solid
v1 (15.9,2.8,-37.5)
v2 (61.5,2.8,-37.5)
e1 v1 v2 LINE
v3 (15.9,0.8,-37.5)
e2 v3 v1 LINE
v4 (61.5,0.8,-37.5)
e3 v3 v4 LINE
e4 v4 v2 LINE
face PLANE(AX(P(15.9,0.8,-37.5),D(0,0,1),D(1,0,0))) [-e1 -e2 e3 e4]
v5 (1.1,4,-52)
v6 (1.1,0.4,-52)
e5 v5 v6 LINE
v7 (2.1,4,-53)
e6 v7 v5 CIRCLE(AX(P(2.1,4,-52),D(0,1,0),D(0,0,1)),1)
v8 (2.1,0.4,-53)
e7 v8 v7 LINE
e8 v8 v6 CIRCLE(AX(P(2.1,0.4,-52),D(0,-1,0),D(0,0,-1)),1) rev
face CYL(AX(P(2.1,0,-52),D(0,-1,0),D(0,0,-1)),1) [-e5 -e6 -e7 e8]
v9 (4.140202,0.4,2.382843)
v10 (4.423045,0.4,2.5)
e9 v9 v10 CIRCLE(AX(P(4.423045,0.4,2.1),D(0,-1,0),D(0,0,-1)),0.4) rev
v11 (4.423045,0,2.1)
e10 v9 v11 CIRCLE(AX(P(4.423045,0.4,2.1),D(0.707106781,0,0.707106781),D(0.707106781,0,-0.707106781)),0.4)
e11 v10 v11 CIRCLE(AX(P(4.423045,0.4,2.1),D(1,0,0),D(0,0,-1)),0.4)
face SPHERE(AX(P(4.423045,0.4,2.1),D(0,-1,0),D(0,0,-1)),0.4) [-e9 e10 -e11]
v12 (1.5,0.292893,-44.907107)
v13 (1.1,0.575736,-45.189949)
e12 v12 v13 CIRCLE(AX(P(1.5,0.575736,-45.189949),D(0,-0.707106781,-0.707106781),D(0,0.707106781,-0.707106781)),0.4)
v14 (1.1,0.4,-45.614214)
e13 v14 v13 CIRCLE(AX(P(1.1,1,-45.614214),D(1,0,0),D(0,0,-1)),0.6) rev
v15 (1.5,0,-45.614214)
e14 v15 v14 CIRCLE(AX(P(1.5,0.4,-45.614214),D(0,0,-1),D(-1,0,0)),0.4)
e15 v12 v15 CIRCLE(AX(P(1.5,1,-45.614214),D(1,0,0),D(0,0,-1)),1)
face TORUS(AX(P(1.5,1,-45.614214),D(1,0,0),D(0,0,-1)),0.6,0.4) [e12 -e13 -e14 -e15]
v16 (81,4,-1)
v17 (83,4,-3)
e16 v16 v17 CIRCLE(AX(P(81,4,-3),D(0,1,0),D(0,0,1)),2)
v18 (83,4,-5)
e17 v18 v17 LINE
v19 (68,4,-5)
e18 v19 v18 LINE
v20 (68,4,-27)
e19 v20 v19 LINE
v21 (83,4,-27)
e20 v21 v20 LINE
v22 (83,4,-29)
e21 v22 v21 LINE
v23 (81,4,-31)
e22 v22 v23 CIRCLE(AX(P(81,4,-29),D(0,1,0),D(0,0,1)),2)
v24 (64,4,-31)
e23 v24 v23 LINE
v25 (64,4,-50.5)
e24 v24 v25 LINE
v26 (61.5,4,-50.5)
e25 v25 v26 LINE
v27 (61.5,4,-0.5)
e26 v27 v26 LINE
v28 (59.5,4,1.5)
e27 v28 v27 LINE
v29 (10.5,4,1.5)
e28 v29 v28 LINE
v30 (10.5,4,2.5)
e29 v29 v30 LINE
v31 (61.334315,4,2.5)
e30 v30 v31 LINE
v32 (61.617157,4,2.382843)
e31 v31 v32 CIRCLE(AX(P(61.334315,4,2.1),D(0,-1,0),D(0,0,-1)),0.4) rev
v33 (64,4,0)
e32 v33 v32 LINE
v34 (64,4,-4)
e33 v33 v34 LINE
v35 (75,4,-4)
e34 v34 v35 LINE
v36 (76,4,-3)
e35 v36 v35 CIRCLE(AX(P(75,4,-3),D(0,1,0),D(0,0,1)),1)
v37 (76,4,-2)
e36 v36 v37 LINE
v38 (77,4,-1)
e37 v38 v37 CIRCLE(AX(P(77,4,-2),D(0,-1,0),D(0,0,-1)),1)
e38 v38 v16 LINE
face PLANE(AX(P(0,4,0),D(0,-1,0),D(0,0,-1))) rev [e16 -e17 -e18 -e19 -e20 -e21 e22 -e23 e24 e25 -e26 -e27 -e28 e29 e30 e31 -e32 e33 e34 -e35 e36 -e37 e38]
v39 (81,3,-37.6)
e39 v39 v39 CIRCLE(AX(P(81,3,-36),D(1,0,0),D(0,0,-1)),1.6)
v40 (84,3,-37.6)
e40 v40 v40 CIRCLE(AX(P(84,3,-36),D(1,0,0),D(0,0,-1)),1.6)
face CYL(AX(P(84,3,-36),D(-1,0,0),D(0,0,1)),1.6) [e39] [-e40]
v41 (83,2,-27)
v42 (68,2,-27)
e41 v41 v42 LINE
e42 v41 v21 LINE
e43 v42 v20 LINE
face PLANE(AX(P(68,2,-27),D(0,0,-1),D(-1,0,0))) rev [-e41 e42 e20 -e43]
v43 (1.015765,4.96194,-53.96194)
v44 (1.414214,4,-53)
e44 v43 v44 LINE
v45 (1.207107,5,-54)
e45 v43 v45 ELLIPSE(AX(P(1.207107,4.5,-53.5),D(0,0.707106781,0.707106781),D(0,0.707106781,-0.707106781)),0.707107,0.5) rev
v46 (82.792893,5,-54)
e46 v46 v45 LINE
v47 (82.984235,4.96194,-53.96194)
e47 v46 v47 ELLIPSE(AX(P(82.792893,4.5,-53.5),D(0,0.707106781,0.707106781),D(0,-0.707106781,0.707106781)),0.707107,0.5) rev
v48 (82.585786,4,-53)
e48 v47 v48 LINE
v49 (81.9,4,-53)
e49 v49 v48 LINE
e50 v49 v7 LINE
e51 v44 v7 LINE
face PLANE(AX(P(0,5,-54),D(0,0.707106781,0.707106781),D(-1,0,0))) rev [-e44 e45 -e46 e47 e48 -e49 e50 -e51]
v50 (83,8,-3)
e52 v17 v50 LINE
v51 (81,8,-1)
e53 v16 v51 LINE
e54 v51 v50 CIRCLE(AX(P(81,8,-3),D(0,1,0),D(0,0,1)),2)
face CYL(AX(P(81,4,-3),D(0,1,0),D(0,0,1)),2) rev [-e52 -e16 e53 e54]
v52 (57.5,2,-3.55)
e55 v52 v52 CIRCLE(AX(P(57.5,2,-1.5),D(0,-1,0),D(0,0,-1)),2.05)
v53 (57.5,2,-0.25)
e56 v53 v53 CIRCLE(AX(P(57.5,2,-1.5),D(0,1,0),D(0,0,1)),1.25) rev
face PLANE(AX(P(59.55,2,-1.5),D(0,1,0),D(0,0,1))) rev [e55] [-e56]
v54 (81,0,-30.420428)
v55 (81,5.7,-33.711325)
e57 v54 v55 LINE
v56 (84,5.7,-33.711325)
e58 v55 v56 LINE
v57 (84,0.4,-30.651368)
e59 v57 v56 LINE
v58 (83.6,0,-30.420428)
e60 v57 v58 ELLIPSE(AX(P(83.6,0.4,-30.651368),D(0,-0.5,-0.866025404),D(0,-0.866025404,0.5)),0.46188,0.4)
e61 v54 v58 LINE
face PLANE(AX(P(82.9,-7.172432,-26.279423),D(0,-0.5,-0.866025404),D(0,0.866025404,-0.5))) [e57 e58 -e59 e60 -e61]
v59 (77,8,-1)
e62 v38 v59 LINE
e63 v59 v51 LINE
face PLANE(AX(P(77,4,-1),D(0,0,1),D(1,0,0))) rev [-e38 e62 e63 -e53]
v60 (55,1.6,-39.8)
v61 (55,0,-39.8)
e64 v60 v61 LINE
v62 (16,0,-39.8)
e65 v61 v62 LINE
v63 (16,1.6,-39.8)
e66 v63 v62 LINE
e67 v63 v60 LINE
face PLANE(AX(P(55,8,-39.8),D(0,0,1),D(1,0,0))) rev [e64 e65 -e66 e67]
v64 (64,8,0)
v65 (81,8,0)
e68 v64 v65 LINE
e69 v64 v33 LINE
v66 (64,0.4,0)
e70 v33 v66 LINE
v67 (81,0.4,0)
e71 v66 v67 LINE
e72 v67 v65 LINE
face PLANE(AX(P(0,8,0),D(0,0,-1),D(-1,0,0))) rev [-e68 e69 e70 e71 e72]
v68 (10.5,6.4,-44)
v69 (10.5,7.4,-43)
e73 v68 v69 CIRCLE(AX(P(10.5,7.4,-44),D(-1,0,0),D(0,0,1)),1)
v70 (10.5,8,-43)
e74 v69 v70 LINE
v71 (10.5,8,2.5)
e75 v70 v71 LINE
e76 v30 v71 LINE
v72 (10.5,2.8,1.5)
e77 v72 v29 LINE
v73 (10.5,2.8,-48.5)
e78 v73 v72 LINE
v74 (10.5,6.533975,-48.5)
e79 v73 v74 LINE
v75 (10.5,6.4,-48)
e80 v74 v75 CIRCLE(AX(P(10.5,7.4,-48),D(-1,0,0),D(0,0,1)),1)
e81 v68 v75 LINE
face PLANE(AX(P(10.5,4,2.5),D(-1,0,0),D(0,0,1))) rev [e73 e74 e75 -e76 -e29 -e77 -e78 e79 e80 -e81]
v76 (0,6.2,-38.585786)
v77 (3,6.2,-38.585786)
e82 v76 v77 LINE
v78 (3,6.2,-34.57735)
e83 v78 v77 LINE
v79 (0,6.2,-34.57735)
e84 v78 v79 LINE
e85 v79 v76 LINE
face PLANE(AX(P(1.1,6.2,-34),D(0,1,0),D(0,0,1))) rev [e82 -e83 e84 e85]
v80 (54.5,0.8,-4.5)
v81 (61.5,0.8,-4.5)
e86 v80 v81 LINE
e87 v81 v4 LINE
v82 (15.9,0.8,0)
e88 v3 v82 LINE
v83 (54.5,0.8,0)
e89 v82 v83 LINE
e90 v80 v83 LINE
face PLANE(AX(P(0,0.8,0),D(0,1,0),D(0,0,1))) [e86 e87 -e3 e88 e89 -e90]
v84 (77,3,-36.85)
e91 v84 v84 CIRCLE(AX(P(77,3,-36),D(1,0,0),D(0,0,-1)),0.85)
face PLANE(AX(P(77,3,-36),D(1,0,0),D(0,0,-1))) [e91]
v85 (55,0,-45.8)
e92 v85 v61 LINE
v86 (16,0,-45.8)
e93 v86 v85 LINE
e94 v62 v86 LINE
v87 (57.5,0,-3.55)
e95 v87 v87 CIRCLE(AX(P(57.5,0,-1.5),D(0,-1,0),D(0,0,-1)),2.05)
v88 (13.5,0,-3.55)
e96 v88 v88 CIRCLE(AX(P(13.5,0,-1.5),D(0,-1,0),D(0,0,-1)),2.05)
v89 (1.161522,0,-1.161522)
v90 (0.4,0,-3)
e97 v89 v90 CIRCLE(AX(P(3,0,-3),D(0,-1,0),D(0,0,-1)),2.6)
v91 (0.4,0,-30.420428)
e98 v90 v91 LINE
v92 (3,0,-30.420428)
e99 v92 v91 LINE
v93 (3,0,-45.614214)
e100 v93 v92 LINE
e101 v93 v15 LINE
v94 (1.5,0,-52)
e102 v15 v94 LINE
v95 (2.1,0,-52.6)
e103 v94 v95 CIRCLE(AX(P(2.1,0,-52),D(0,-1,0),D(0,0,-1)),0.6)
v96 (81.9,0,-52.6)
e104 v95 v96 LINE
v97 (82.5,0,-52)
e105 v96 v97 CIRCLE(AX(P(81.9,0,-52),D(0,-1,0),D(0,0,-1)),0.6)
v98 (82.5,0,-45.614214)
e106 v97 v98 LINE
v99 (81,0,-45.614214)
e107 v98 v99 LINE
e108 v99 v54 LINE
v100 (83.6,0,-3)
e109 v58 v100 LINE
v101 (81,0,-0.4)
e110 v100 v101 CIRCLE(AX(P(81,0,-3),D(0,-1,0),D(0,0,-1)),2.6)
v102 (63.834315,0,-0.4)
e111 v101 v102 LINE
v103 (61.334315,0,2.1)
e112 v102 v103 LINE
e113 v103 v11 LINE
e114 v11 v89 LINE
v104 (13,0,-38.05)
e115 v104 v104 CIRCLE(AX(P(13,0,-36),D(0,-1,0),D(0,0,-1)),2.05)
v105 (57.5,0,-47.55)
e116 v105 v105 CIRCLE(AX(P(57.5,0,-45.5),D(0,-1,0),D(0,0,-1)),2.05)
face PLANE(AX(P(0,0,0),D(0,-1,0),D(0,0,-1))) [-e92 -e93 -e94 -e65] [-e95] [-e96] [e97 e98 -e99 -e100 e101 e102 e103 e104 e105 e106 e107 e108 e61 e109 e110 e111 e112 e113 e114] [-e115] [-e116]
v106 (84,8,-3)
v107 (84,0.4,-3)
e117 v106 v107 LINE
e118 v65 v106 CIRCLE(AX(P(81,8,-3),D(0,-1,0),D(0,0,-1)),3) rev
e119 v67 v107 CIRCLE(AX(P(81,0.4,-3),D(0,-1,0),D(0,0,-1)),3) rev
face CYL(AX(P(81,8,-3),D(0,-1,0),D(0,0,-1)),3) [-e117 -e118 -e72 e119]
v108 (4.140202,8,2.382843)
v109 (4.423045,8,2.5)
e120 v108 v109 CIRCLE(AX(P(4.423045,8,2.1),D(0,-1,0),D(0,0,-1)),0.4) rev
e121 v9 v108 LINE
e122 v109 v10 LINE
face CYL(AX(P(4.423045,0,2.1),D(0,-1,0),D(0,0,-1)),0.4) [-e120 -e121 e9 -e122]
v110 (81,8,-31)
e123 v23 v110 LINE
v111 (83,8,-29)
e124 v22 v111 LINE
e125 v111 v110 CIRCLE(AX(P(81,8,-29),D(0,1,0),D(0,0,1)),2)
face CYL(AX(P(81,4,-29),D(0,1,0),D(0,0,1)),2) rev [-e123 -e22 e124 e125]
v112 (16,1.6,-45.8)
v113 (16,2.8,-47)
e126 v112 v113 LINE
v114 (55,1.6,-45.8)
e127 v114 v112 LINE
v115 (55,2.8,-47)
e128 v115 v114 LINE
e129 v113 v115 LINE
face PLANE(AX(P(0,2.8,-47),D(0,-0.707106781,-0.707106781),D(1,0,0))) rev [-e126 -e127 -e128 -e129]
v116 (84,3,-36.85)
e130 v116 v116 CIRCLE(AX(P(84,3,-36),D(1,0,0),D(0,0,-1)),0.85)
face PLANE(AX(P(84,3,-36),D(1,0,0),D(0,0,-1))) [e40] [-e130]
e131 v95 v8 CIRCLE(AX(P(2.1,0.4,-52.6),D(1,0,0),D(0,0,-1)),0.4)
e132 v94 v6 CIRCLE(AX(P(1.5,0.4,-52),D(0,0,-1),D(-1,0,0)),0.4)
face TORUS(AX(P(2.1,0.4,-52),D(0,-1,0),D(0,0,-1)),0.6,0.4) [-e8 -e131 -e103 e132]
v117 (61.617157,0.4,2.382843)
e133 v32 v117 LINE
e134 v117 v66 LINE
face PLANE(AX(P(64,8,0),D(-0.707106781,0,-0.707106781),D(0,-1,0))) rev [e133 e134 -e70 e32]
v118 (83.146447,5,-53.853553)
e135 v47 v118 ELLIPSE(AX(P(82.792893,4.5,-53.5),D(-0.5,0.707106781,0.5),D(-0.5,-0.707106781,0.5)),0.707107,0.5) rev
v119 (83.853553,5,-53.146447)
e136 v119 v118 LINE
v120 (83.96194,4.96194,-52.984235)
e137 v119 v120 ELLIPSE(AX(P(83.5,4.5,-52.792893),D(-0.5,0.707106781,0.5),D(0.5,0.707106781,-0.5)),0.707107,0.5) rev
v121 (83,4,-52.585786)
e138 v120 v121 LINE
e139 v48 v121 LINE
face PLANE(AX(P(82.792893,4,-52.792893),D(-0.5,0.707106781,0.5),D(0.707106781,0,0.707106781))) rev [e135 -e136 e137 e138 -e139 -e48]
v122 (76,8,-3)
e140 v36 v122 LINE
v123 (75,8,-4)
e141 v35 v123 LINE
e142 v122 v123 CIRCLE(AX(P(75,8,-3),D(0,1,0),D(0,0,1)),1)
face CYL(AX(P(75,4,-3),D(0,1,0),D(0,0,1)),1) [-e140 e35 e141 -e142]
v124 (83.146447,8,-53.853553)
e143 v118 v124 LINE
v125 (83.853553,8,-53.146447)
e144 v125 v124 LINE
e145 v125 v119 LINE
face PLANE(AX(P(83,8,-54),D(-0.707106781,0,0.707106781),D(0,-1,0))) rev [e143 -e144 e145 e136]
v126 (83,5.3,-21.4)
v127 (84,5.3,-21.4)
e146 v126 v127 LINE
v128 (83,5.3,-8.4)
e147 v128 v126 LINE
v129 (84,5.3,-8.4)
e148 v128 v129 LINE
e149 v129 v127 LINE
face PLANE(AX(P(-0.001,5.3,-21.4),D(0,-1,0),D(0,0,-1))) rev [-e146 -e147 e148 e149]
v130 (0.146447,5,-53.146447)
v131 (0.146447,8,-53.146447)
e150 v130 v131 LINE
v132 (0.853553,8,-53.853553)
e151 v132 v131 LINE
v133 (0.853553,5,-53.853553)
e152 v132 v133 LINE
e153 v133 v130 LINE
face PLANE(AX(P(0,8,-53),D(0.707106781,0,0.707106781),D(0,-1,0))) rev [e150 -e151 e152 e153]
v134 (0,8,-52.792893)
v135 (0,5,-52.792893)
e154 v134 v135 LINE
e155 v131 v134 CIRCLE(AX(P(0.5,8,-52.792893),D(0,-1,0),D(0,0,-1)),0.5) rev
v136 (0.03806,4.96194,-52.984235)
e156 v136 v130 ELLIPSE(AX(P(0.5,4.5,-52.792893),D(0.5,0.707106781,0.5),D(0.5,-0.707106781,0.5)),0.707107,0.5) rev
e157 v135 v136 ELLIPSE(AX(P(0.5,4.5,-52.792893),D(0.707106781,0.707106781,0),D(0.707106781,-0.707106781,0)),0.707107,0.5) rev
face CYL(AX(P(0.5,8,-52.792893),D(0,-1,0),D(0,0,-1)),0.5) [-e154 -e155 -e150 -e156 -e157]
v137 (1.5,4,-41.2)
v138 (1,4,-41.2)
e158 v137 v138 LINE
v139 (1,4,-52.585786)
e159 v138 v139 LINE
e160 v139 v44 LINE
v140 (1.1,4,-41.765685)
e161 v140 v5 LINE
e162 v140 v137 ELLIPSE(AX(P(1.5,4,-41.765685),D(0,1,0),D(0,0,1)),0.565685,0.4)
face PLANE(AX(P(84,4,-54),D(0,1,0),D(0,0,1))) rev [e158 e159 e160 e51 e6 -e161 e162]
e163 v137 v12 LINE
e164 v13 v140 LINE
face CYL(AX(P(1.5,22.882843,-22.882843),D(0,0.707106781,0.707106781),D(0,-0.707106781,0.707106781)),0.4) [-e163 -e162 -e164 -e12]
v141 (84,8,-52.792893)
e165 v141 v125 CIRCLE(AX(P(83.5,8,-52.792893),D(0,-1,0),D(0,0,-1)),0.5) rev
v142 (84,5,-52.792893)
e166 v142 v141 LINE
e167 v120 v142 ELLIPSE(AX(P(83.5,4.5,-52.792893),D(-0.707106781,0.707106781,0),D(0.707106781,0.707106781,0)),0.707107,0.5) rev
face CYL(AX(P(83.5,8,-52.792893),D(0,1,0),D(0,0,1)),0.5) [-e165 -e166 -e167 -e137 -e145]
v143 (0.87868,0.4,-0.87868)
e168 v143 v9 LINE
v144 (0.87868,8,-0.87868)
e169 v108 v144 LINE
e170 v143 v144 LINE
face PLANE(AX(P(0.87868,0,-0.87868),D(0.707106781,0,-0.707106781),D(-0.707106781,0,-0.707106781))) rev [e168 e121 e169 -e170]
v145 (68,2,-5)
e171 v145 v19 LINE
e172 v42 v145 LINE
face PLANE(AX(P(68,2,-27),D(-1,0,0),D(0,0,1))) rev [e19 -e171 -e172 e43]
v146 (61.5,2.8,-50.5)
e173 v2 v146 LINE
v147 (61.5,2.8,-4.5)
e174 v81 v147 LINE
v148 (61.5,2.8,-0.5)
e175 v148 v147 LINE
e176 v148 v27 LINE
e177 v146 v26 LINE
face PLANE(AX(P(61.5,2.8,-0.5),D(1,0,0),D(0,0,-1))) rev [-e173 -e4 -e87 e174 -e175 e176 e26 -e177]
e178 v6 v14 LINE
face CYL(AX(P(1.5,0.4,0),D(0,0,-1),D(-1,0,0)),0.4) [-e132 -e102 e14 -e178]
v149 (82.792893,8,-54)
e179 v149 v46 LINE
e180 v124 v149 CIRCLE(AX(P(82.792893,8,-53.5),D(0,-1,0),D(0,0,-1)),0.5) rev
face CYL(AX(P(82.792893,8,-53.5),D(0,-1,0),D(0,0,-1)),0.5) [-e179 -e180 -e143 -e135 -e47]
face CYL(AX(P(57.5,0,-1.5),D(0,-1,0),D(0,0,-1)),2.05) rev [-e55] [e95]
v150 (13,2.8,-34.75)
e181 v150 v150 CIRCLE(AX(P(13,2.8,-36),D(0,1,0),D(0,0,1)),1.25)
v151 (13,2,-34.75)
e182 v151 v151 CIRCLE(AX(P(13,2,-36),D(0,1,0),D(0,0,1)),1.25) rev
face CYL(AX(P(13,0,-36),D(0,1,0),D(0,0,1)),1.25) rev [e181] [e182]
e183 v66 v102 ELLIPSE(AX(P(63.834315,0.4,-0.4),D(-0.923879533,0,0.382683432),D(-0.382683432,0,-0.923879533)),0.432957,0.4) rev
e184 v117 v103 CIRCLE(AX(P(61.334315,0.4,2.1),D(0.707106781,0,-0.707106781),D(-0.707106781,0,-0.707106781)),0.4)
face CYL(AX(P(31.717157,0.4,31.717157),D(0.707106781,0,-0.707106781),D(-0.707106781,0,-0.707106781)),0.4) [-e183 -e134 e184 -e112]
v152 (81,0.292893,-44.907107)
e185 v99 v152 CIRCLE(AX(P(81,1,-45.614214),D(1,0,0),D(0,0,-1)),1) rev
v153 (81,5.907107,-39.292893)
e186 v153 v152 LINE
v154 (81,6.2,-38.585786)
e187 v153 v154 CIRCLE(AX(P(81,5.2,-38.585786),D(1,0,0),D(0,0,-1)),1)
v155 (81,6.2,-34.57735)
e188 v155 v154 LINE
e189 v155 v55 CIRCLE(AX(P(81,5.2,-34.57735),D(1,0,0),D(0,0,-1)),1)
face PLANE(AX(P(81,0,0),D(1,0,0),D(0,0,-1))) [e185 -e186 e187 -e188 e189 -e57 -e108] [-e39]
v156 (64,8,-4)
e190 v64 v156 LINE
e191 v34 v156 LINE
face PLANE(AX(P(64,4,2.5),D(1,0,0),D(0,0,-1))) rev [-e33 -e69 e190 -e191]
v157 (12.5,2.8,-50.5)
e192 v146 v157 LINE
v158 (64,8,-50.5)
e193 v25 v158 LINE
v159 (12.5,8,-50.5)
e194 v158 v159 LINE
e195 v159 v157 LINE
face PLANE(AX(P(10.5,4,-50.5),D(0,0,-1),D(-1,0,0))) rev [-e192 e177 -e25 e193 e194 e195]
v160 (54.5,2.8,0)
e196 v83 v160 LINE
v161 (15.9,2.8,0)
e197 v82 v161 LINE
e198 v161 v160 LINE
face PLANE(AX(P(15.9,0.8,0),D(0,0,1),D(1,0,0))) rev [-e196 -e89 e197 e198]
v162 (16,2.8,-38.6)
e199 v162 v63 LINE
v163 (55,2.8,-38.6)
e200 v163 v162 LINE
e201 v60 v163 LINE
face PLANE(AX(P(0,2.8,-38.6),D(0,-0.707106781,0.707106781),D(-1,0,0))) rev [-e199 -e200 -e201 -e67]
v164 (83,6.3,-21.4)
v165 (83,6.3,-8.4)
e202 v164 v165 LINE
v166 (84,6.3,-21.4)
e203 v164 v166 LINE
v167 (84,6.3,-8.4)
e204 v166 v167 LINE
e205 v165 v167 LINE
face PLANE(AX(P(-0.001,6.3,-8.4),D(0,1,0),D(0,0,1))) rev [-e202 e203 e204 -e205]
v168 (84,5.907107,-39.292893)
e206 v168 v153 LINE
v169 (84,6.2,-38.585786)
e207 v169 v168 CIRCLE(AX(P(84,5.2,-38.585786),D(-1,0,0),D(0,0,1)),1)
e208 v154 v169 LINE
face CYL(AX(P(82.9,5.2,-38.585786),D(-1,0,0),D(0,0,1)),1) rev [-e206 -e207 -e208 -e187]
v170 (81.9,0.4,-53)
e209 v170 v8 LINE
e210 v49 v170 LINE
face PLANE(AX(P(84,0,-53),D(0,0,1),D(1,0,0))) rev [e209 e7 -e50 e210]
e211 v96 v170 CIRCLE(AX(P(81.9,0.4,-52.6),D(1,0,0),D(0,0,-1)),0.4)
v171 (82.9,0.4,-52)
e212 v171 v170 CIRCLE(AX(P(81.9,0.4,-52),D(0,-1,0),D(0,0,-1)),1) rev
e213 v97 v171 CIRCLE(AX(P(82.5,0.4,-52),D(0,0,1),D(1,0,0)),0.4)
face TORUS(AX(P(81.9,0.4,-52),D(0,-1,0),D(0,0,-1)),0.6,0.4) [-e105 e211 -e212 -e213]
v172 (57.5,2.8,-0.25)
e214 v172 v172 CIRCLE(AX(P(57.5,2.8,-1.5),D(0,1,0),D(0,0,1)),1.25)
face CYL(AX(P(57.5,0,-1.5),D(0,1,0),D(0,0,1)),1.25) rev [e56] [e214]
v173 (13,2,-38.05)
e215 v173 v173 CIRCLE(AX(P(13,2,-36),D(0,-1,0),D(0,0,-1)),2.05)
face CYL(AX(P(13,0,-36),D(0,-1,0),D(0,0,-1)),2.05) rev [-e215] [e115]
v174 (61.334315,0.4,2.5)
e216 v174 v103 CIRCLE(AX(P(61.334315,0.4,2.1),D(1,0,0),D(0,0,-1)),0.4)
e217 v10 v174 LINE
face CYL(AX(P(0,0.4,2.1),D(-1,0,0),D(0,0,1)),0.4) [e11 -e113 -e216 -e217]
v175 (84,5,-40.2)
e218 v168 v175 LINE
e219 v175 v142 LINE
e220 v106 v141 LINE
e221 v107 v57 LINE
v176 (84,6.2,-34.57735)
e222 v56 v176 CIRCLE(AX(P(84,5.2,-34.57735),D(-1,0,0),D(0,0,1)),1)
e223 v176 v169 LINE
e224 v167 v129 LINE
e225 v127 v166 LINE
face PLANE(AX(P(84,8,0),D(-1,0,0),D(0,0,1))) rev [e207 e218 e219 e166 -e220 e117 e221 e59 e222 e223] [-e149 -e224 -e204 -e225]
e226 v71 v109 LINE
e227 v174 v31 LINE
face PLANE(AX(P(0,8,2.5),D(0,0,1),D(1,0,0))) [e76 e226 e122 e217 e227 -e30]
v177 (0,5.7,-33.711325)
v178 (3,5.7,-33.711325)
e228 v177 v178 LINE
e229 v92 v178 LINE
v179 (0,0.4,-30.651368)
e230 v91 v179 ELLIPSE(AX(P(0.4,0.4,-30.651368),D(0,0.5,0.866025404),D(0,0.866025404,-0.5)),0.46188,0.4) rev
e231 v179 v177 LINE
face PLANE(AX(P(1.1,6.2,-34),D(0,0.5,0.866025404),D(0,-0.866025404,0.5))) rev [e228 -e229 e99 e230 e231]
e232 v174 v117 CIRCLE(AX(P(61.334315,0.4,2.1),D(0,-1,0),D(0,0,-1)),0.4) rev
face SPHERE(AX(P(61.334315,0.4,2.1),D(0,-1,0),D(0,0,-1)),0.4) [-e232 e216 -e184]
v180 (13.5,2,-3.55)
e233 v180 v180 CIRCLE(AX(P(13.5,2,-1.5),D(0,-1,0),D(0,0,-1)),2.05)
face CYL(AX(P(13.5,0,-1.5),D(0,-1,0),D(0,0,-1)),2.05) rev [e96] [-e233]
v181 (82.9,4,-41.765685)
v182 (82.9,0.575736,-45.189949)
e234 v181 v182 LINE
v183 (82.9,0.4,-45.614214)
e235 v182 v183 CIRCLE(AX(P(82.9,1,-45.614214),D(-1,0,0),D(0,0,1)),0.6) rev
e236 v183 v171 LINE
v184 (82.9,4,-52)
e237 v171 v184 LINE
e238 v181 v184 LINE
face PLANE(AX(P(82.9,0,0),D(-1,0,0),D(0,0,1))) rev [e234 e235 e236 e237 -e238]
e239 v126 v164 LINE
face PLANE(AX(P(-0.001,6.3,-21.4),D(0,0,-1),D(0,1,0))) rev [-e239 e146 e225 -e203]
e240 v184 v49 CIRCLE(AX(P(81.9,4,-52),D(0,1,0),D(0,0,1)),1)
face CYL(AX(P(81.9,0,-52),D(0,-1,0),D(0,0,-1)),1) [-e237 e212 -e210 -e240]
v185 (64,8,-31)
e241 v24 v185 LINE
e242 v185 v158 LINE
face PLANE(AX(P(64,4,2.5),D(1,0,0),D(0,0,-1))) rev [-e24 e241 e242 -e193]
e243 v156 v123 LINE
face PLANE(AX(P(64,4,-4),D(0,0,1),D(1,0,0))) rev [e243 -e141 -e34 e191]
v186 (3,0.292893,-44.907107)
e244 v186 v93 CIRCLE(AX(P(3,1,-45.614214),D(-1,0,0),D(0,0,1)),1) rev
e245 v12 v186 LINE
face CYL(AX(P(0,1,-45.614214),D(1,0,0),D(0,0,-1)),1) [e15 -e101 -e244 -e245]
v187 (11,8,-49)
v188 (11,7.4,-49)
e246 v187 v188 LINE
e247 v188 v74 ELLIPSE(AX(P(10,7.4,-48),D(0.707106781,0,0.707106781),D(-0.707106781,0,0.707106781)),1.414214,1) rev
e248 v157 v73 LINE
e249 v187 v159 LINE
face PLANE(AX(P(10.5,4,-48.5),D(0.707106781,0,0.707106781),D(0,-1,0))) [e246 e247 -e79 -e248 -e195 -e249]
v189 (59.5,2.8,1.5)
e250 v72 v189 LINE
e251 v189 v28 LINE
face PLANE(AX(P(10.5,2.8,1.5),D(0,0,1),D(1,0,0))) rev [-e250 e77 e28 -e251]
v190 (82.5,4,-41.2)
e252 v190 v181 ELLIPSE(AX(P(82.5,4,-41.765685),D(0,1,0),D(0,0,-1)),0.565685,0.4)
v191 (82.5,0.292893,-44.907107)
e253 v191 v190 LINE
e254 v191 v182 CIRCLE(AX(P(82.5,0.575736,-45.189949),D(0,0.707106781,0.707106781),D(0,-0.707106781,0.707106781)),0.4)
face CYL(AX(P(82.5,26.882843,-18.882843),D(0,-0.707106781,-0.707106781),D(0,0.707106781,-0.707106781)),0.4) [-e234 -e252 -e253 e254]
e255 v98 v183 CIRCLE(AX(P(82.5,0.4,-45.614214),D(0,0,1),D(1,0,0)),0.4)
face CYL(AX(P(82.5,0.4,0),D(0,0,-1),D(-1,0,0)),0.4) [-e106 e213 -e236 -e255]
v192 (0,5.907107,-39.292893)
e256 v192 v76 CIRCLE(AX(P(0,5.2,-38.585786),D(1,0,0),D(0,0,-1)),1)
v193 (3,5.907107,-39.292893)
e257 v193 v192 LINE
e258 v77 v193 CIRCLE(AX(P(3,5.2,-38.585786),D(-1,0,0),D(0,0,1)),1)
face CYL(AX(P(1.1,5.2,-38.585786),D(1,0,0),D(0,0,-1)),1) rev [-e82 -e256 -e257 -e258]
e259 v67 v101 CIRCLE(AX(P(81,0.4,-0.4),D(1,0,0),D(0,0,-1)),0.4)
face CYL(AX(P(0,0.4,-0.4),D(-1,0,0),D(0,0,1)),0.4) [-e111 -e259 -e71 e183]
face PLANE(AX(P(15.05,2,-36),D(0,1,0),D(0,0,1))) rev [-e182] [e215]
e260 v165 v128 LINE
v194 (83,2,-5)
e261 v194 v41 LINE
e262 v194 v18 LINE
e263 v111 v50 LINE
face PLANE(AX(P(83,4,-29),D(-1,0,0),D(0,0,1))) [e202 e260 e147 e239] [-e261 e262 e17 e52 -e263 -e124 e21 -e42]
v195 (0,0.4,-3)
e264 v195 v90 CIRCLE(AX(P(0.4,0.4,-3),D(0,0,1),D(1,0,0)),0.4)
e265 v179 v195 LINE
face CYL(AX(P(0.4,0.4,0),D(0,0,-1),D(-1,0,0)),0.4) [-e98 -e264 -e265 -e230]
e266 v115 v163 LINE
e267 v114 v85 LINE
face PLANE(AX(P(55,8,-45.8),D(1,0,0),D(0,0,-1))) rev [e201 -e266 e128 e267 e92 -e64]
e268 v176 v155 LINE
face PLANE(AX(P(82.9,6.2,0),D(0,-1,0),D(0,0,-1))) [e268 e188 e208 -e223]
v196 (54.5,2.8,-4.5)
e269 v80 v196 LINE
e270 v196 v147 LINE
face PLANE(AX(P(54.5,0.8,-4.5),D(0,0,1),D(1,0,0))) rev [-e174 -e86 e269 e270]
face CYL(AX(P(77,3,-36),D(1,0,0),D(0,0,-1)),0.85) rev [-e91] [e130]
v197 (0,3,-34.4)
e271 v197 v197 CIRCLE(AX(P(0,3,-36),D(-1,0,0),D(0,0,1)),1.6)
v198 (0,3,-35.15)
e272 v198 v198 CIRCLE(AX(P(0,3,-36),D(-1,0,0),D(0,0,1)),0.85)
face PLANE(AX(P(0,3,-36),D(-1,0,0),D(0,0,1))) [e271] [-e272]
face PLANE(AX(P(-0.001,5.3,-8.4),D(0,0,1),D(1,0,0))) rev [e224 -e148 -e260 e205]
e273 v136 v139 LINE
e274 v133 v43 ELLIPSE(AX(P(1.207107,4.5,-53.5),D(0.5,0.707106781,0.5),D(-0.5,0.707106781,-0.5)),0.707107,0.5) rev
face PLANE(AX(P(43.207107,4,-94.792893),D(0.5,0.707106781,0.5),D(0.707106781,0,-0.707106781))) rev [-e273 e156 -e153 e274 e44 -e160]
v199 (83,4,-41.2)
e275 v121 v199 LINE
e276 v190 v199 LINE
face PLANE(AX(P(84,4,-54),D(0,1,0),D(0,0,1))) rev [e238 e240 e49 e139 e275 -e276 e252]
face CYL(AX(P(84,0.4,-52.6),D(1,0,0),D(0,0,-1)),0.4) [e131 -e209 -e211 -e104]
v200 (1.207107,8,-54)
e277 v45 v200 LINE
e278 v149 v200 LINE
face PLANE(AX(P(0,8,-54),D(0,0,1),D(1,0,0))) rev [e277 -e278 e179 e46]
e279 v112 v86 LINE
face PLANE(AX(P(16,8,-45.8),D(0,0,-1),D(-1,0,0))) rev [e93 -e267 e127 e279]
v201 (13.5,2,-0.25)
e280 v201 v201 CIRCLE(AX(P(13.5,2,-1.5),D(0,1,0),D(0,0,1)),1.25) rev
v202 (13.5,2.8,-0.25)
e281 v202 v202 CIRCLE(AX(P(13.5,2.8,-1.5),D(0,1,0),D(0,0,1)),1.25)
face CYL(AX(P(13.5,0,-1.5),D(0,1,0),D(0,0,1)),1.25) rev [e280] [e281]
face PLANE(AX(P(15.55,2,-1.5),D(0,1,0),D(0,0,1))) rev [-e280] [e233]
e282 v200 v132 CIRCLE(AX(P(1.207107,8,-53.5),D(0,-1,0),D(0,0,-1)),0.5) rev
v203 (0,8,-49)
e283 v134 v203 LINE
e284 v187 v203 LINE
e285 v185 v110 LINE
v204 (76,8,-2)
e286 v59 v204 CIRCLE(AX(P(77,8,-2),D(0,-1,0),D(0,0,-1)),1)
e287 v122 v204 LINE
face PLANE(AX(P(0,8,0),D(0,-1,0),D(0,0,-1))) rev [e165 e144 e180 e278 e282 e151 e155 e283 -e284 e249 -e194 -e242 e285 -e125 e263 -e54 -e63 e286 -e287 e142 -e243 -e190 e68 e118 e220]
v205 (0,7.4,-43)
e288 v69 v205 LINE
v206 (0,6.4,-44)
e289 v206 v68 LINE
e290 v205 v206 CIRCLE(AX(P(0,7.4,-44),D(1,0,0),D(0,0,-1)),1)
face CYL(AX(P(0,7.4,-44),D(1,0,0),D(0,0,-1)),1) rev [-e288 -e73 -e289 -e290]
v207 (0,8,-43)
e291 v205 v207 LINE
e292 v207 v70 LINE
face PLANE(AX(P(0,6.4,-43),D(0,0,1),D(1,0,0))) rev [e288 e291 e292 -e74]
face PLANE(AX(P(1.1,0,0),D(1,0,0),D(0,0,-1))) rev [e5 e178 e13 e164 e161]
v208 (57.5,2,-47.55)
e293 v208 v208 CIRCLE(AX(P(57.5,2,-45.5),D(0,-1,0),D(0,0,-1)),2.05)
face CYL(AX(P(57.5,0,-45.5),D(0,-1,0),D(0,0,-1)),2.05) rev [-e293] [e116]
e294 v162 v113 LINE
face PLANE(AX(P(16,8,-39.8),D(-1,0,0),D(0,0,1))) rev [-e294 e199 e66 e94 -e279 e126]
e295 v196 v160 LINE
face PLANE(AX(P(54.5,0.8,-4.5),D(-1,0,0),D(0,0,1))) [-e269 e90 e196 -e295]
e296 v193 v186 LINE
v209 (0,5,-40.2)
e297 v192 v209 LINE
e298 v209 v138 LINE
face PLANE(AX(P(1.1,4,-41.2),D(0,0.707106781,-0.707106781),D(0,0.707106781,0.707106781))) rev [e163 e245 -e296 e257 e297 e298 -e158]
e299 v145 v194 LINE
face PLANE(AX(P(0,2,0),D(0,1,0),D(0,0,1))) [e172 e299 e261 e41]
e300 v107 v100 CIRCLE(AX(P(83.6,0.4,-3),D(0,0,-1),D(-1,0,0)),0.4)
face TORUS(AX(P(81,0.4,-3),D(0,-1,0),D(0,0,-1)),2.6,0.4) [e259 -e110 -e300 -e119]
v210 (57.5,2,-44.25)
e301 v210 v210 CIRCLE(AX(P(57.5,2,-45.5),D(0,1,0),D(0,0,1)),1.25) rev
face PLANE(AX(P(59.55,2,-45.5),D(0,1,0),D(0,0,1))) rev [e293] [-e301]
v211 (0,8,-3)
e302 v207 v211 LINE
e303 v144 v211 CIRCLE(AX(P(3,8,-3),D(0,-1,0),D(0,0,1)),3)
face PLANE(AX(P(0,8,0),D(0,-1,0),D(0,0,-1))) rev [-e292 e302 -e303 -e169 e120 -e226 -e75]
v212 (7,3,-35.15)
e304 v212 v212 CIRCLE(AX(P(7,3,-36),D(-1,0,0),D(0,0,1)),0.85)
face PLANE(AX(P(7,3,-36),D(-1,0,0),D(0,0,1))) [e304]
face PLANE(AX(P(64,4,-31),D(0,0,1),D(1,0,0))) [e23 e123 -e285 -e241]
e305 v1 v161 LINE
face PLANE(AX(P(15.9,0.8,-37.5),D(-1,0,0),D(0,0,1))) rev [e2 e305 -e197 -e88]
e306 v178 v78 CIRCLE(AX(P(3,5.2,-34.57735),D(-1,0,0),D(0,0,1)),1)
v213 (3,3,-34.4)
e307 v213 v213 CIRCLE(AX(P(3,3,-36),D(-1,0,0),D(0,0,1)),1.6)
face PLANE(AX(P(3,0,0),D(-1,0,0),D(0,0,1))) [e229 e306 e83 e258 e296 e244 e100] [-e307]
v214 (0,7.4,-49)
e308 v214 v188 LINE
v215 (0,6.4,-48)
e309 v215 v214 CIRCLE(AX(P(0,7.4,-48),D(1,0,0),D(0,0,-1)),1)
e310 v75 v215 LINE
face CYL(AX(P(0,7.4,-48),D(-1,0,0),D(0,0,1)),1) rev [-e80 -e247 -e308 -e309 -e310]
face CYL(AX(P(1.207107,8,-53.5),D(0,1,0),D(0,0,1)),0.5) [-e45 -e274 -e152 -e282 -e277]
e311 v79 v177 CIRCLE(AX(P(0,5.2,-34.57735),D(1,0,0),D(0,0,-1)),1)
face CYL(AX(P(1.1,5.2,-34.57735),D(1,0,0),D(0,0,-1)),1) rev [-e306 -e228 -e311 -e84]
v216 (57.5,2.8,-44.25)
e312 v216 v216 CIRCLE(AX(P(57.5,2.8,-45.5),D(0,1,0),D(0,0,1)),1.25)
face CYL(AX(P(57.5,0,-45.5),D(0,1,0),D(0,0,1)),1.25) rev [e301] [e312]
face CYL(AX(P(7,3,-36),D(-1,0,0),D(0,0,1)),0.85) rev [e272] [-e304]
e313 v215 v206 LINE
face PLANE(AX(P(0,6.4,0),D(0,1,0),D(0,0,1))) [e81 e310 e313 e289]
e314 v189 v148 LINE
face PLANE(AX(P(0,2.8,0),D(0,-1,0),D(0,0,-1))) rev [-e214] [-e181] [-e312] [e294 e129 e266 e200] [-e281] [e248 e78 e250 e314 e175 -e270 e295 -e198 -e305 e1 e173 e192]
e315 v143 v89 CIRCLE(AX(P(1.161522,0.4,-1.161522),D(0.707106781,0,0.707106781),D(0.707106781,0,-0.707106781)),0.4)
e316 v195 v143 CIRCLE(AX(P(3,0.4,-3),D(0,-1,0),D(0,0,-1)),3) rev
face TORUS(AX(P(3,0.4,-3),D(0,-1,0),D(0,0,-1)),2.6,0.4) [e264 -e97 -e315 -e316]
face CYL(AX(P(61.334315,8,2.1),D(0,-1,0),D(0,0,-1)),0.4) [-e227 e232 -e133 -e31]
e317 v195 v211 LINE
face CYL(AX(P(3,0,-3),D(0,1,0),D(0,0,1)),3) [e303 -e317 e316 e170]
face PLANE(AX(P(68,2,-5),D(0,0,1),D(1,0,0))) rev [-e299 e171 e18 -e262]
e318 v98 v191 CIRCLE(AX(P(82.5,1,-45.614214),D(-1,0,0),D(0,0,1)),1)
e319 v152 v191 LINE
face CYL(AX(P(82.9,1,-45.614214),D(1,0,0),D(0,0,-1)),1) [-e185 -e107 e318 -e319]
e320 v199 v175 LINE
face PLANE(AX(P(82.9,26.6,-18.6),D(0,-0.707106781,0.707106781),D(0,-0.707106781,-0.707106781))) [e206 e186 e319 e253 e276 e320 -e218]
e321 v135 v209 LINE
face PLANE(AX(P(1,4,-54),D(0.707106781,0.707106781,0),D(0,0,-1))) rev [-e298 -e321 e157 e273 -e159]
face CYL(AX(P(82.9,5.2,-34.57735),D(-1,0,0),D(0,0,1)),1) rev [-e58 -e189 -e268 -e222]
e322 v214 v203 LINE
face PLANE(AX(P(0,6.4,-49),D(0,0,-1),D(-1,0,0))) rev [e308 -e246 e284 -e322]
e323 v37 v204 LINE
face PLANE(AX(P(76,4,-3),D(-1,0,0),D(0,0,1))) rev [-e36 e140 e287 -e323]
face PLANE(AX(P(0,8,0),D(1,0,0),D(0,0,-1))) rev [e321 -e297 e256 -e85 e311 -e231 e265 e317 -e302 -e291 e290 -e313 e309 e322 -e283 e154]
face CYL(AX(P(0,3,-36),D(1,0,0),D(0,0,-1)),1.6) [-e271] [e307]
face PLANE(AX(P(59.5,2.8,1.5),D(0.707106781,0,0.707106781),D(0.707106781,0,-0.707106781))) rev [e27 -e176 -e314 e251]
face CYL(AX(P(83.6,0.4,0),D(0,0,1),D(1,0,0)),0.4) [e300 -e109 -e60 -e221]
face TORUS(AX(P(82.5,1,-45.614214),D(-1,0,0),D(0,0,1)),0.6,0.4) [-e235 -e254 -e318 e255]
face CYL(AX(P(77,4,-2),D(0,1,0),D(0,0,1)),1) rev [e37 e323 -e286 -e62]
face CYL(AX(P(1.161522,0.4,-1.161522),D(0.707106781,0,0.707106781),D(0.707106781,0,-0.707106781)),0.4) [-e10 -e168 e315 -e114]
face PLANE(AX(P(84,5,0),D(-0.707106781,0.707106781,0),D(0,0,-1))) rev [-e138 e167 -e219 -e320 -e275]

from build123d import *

# Parameters (mm, degrees)
SKETCH_1_W           = 84
SKETCH_1_H           = 54
EXTRUDE_1_DEPTH      = 8
SKETCH_2_W           = 60
SKETCH_2_H           = 2.5
EXTRUDE_2_DEPTH      = 8
CHAMFER_1_SIZE       = 4
FILLET_1_R           = 3
SKETCH_3_W           = 1
SKETCH_3_H           = 4
CUT_EXTRUDE_1_DEPTH  = 101.179838291
CUT_EXTRUDE_2_DEPTH  = 1.1
CUT_EXTRUDE_START    = -84
CUT_EXTRUDE_3_DEPTH  = 1.1
FILLET_2_R           = 1
CHAMFER_2_SIZE       = 1
CUT_EXTRUDE_4_DEPTH  = 1.9
CUT_EXTRUDE_START_2  = -81.8
CUT_EXTRUDE_5_DEPTH  = 1.9
FILLET_3_R           = 1
CHAMFER_4_SIZE       = 1
SKETCH_6_R           = 1.6
EXTRUDE_3_DEPTH      = 3
EXTRUDE_START        = -81
SKETCH_6_2_R         = 1.6
EXTRUDE_4_DEPTH      = 3
SKETCH_7_R           = 0.85
CUT_EXTRUDE_6_DEPTH  = 7
CUT_EXTRUDE_START_3  = -77
SKETCH_7_2_R         = 0.85
CUT_EXTRUDE_7_DEPTH  = 7
FILLET_4_R           = 0.5
SKETCH_8_W           = 53.5
SKETCH_8_H           = 53
CUT_EXTRUDE_8_DEPTH  = 4
CUT_EXTRUDE_9_DEPTH  = 1.2
CHAMFER_5_SIZE       = 2
SKETCH_11_R          = 1.25
CUT_EXTRUDE_10_DEPTH = 100.995199885
CUT_EXTRUDE_13_DEPTH = 101.179838291
FILLET_5_R           = 0.4
FILLET_6_R           = 0.4
CUT_EXTRUDE_14_DEPTH = 2
SKETCH_16_W          = 39
SKETCH_16_H          = 6
CUT_EXTRUDE_15_DEPTH = 101.179838291
CHAMFER_6_SIZE       = 1.2
SKETCH_17_W          = 14
SKETCH_17_H          = 6
CUT_EXTRUDE_16_DEPTH = 1.6
CUT_EXTRUDE_18_DEPTH = 4
SKETCH_21_W          = 15
SKETCH_21_H          = 22
CUT_EXTRUDE_19_DEPTH = 2
OTHER_1_OUTLINE_R    = 2.05
OTHER_1_OUTLINE_R_2  = 1.25
OTHER_1_DEPTH        = 2
FILLET_8_R           = 1
CUT_EXTRUDE_20_REACH = 102.18


# Read off the part's stored shape, not the designer's step: 高级异型孔1
# Some blends are built 0.0001 mm under size
with BuildPart() as part:
    # 草图1 → 凸台-拉伸1 (new body)
    with BuildSketch(Plane(origin=(0, 0, 0), x_dir=(1, 0, 0), z_dir=(0, 1, 0))):
        with Locations((42, 27)):
            Rectangle(SKETCH_1_W, SKETCH_1_H)
    extrude(amount=EXTRUDE_1_DEPTH)

    # 草图2 → 凸台-拉伸2 (add)
    with BuildSketch(Plane.XZ):
        with Locations((30, 1.25)):
            Rectangle(SKETCH_2_W, SKETCH_2_H)
    extrude(amount=-EXTRUDE_2_DEPTH)

    # 倒角1
    # the kernel refuses this chamfer: 4 mm, written as the material it adds along each edge
    with BuildSketch(Plane(origin=(60, 0, 0), x_dir=(0.9996219169112968, 0, -0.02749587661058639), z_dir=(0, 1, 0))) as chamfer_1_piece_1_section:
        Polygon((CHAMFER_1_SIZE * 0.999621916911, -CHAMFER_1_SIZE * 0.0274958766106), (-CHAMFER_1_SIZE * 0.0274958766106, -CHAMFER_1_SIZE * 0.999621916911), (0, 0), align=None)
    chamfer_1_piece_1 = extrude(amount=8, mode=Mode.PRIVATE)
    chamfer_1_piece_1 = split(chamfer_1_piece_1, bisect_by=Plane(origin=(61.48305822, 4, 2.5), z_dir=(0, 0, -1)), keep=Keep.TOP, mode=Mode.PRIVATE)
    add(chamfer_1_piece_1)

    # 圆角1
    fillet_1_edges = [part.edges().sort_by_distance(p)[0] for p in [
        (84, 4, 0),
    ]]
    fillet(fillet_1_edges, radius=FILLET_1_R)

    # 草图3 → 切除-拉伸1 (cut, through all)
    with BuildSketch(Plane.ZY):
        with Locations((-53.5, 2)):
            Rectangle(SKETCH_3_W, SKETCH_3_H)
    extrude(amount=-CUT_EXTRUDE_1_DEPTH, mode=Mode.SUBTRACT)

    # 草图4 → 切除-拉伸2 (cut)
    with BuildSketch(Plane.ZY):
        Polygon((-34, 6.2), (-30.420428331, 0), (-53, 0), (-53, 4), (-41.2, 4), (-39, 6.2), align=None)
    extrude(amount=-CUT_EXTRUDE_2_DEPTH, mode=Mode.SUBTRACT)

    # 草图4<3> → 切除-拉伸3 (cut)
    with BuildSketch(Plane.ZY.offset(CUT_EXTRUDE_START)):
        Polygon((-34, 6.2), (-30.420428331, 0), (-53, 0), (-53, 4), (-41.2, 4), (-39, 6.2), align=None)
    extrude(amount=CUT_EXTRUDE_3_DEPTH, mode=Mode.SUBTRACT)

    # 圆角2
    fillet_2_edges = [part.edges().sort_by_distance(p)[0] for p in [
        (1.1, 2, -53),
        (82.9, 2, -53),
    ]]
    fillet(fillet_2_edges, radius=FILLET_2_R)

    # 倒角2
    chamfer_2_edges = [part.edges().sort_by_distance(p)[0] for p in [
        (0, 6, -54),
        (84, 6, -54),
    ]]
    chamfer(chamfer_2_edges, length=CHAMFER_2_SIZE)

    # 草图5 → 切除-拉伸4 (cut)
    with BuildSketch(Plane.ZY.offset(-1.1)):
        Polygon((-45.2, 0), (-30.420428331, 0), (-34, 6.2), (-39, 6.2), align=None)
    extrude(amount=-CUT_EXTRUDE_4_DEPTH, mode=Mode.SUBTRACT)

    # 草图5<2> → 切除-拉伸5 (cut)
    with BuildSketch(Plane.ZY.offset(-1.1).offset(CUT_EXTRUDE_START_2)):
        Polygon((-39, 6.2), (-41.2, 4), (-45.2, 0), (-30.420428331, 0), (-34, 6.2), align=None)
    extrude(amount=CUT_EXTRUDE_5_DEPTH, mode=Mode.SUBTRACT)

    # 圆角3
    fillet_3_edges = [part.edges().sort_by_distance(p)[0] for p in [
        (2.05, 0, -45.2),
        (81.95, 0, -45.2),
        (1.5, 6.2, -39),
        (1.5, 6.2, -34),
        (82.5, 6.2, -34),
        (82.5, 6.2, -39),
    ]]
    fillet(fillet_3_edges, radius=FILLET_3_R)

    # 倒角4
    chamfer_4_edges = [part.edges().sort_by_distance(p)[0] for p in [
        (42, 4, -54),
        (83.5, 4, -53.5),
        (0.5, 4, -53.5),
        (84, 4, -47.1),
        (0, 4, -47.1),
    ]]
    chamfer(chamfer_4_edges, length=CHAMFER_4_SIZE - 0.0001)  # a hair under: the kernel refuses the full size

    # 草图6 → 凸台-拉伸3 (add)
    with BuildSketch(Plane.ZY.offset(-3)):
        with Locations((-36, 3)):
            Circle(SKETCH_6_R)
    extrude(amount=EXTRUDE_3_DEPTH)

    # 草图6<2> → 凸台-拉伸4 (add)
    with BuildSketch(Plane.ZY.offset(-3).offset(EXTRUDE_START)):
        with Locations((-36, 3)):
            Circle(SKETCH_6_2_R)
    extrude(amount=EXTRUDE_4_DEPTH)

    # 草图7 → 切除-拉伸6 (cut)
    with BuildSketch(Plane.ZY):
        with Locations((-36, 3)):
            Circle(SKETCH_7_R)
    extrude(amount=-CUT_EXTRUDE_6_DEPTH, mode=Mode.SUBTRACT)

    # 草图7<2> → 切除-拉伸7 (cut)
    with BuildSketch(Plane.ZY.offset(CUT_EXTRUDE_START_3)):
        with Locations((-36, 3)):
            Circle(SKETCH_7_2_R)
    extrude(amount=-CUT_EXTRUDE_7_DEPTH, mode=Mode.SUBTRACT)

    # 圆角4
    fillet_4_edges = [part.edges().sort_by_distance(p)[0] for p in [
        (0, 6.49995, -53),
        (83, 6.49995, -54),
        (1, 6.49995, -54),
        (84, 6.49995, -53),
    ]]
    fillet(fillet_4_edges, radius=FILLET_4_R)

    # 草图8 → 切除-拉伸8 (cut)
    with BuildSketch(Plane(origin=(0, 8, 0), x_dir=(1, 0, 0), z_dir=(0, 1, 0))):
        with Locations((37.25, 24)):
            Rectangle(SKETCH_8_W, SKETCH_8_H)
    extrude(amount=-CUT_EXTRUDE_8_DEPTH, mode=Mode.SUBTRACT)

    # 草图10 → 切除-拉伸9 (cut)
    with BuildSketch(Plane(origin=(0, 4, 0), x_dir=(1, 0, 0), z_dir=(0, 1, 0))):
        Polygon((10.5, -1.5), (59.5, -1.5), (61.5, 0.5), (61.5, 50.5), (10.5, 50.5), align=None)
    extrude(amount=-CUT_EXTRUDE_9_DEPTH, mode=Mode.SUBTRACT)

    # 倒角5
    chamfer_5_edges = [part.edges().sort_by_distance(p)[0] for p in [
        (10.5, 5.4, -50.5),
    ]]
    chamfer(chamfer_5_edges, length=CHAMFER_5_SIZE)

    # 草图11 → 切除-拉伸10 (cut, through all)
    with BuildSketch(Plane(origin=(0, 2.8, 0), x_dir=(1, 0, 0), z_dir=(0, 1, 0))):
        with Locations(Location((13.5, 1.5, 0), (0, 0, 270))):
            Circle(SKETCH_11_R)
        with Locations(Location((57.5, 1.5, 0), (0, 0, 270))):
            Circle(SKETCH_11_R)
        with Locations(Location((57.5, 45.5, 0), (0, 0, 270))):
            Circle(SKETCH_11_R)
        with Locations(Location((13, 36, 0), (0, 0, 270))):
            Circle(SKETCH_11_R)
    extrude(amount=-CUT_EXTRUDE_10_DEPTH, mode=Mode.SUBTRACT)

    # 草图14 → 切除-拉伸13 (cut, through all)
    with BuildSketch(Plane(origin=(0, 8, 0), x_dir=(1, 0, 0), z_dir=(0, 1, 0))):
        with BuildLine():
            Line((4.257359313, -2.5), (0, -2.5))
            Line((0, -2.5), (0, 3))
            ThreePointArc((0, 3), (0.228361402, 1.851949703), (0.878679656, 0.878679656))
            Line((0.878679656, 0.878679656), (4.257359313, -2.5))
        make_face()
    extrude(amount=-CUT_EXTRUDE_13_DEPTH, mode=Mode.SUBTRACT)

    # 圆角5
    fillet_5_edges = [part.edges().sort_by_distance(p)[0] for p in [
        (61.5, 2, 2.5),
        (4.257359313, 4, 2.5),
    ]]
    fillet(fillet_5_edges, radius=FILLET_5_R)

    # 圆角6
    fillet_6_edges = [part.edges().sort_by_distance(p)[0] for p in [
        (82.9, 2.146446609, -43.053553391),
        (82.9, 0.076120467, -45.23153013),
        (1.1, 2.146446609, -43.053553391),
        (1.1, 0.076120467, -45.23153013),
        (72.5, 0, 0),
        (62.808578644, 0, 1.191421356),
        (0.228361402, 0, -1.851949703),
        (32.878679656, 0, 2.5),
        (84, 0, -16.710214166),
        (2.509440841, 0, 0.752081528),
        (4.269971365, 0, 2.469551813),
        (61.487387948, 0, 2.469551813),
        (83.121320344, 0, -0.878679656),
        (0, 0, -16.710214166),
        (1.1, 0, -48.807106781),
        (82.9, 0, -48.807106781),
        (42, 0, -53),
        (82.607106781, 0, -52.707106781),
        (1.392893219, 0, -52.707106781),
    ]]
    fillet(fillet_6_edges, radius=FILLET_6_R)

    # 草图15 → 切除-拉伸14 (cut)
    with BuildSketch(Plane(origin=(0, 2.8, 0), x_dir=(1, 0, 0), z_dir=(0, 1, 0))):
        Polygon((15.9, 37.5), (61.5, 37.5), (61.5, 4.5), (54.5, 4.5), (54.5, 0), (15.9, 0), align=None)
    extrude(amount=-CUT_EXTRUDE_14_DEPTH, mode=Mode.SUBTRACT)

    # 草图16 → 切除-拉伸15 (cut, through all)
    with BuildSketch(Plane.XZ):
        with Locations((35.5, -42.8)):
            Rectangle(SKETCH_16_W, SKETCH_16_H)
    extrude(amount=-CUT_EXTRUDE_15_DEPTH, mode=Mode.SUBTRACT)

    # 倒角6
    chamfer_6_edges = [part.edges().sort_by_distance(p)[0] for p in [
        (35.5, 2.8, -39.8),
        (35.5, 2.8, -45.8),
    ]]
    chamfer(chamfer_6_edges, length=CHAMFER_6_SIZE)

    # 草图17 → 切除-拉伸16 (cut)
    with BuildSketch(Plane(origin=(0, 8, 0), x_dir=(1, 0, 0), z_dir=(0, 1, 0))):
        with Locations((7, 46)):
            Rectangle(SKETCH_17_W, SKETCH_17_H)
    extrude(amount=-CUT_EXTRUDE_16_DEPTH, mode=Mode.SUBTRACT)

    # 草图20 → 切除-拉伸18 (cut)
    with BuildSketch(Plane(origin=(0, 8, 0), x_dir=(1, 0, 0), z_dir=(0, 1, 0))):
        with BuildLine():
            Line((64, 31), (81, 31))
            ThreePointArc((81, 31), (82.414213562, 30.414213562), (83, 29))
            Line((83, 29), (83, 3))
            ThreePointArc((83, 3), (82.414213562, 1.585786438), (81, 1))
            Line((81, 1), (77, 1))
            ThreePointArc((77, 1), (76.292893219, 1.292893219), (76, 2))
            Line((76, 2), (76, 3))
            ThreePointArc((76, 3), (75.707106781, 3.707106781), (75, 4))
            Line((75, 4), (64, 4))
            Line((64, 4), (64, 31))
        make_face()
    extrude(amount=-CUT_EXTRUDE_18_DEPTH, mode=Mode.SUBTRACT)

    # 草图21 → 切除-拉伸19 (cut)
    with BuildSketch(Plane(origin=(0, 4, 0), x_dir=(1, 0, 0), z_dir=(0, 1, 0))):
        with Locations((75.5, 16)):
            Rectangle(SKETCH_21_W, SKETCH_21_H)
    extrude(amount=-CUT_EXTRUDE_19_DEPTH, mode=Mode.SUBTRACT)

    # 高级异型孔1 outline → 高级异型孔1 (cut)
    # profile 1 of 4: a face of its own
    with BuildSketch(Plane(origin=(0, 0, 0), x_dir=(1, 0, 0), z_dir=(0, 1, 0))):
        with Locations((13, 36)):
            Circle(OTHER_1_OUTLINE_R)
        with Locations((13, 36)):
            Circle(OTHER_1_OUTLINE_R_2, mode=Mode.SUBTRACT)
    # profile 2 of 4: a face of its own
    with BuildSketch(Plane(origin=(0, 0, 0), x_dir=(1, 0, 0), z_dir=(0, 1, 0))):
        with Locations((13.5, 1.5)):
            Circle(OTHER_1_OUTLINE_R)
        with Locations((13.5, 1.5)):
            Circle(OTHER_1_OUTLINE_R_2, mode=Mode.SUBTRACT)
    # profile 3 of 4: a face of its own
    with BuildSketch(Plane(origin=(0, 0, 0), x_dir=(1, 0, 0), z_dir=(0, 1, 0))):
        with Locations((57.5, 1.5)):
            Circle(OTHER_1_OUTLINE_R)
        with Locations((57.5, 1.5)):
            Circle(OTHER_1_OUTLINE_R_2, mode=Mode.SUBTRACT)
    # profile 4 of 4: a face of its own
    with BuildSketch(Plane(origin=(0, 0, 0), x_dir=(1, 0, 0), z_dir=(0, 1, 0))):
        with Locations((57.5, 45.5)):
            Circle(OTHER_1_OUTLINE_R)
        with Locations((57.5, 45.5)):
            Circle(OTHER_1_OUTLINE_R_2, mode=Mode.SUBTRACT)
    extrude(amount=OTHER_1_DEPTH, mode=Mode.SUBTRACT)

    # 圆角8
    fillet_8_edges = [part.edges().sort_by_distance(p)[0] for p in [
        (5.25, 6.4, -43),
        (5.5, 6.4, -49),
    ]]
    fillet(fillet_8_edges, radius=FILLET_8_R)

    # 草图24 → 切除-拉伸20 (cut, up to next)
    with BuildSketch(Plane(origin=(84, 0, 0), x_dir=(0, 0, -1), z_dir=(1, 0, 0)), mode=Mode.PRIVATE) as cut_extrude_20_sk1:
        Polygon((21.4, 5.3), (15.4, 5.3), (14.4, 5.3), (8.4, 5.3), (8.4, 6.3), (14.4, 6.3), (15.4, 6.3), (21.4, 6.3), align=None)
    cut_extrude_20_tool1 = extrude(cut_extrude_20_sk1.sketch, amount=-CUT_EXTRUDE_20_REACH, mode=Mode.PRIVATE) & part.part
    add(cut_extrude_20_tool1.solids().sort_by_distance((84, 5.8, -14.9))[0], mode=Mode.SUBTRACT)


solid = part.part
